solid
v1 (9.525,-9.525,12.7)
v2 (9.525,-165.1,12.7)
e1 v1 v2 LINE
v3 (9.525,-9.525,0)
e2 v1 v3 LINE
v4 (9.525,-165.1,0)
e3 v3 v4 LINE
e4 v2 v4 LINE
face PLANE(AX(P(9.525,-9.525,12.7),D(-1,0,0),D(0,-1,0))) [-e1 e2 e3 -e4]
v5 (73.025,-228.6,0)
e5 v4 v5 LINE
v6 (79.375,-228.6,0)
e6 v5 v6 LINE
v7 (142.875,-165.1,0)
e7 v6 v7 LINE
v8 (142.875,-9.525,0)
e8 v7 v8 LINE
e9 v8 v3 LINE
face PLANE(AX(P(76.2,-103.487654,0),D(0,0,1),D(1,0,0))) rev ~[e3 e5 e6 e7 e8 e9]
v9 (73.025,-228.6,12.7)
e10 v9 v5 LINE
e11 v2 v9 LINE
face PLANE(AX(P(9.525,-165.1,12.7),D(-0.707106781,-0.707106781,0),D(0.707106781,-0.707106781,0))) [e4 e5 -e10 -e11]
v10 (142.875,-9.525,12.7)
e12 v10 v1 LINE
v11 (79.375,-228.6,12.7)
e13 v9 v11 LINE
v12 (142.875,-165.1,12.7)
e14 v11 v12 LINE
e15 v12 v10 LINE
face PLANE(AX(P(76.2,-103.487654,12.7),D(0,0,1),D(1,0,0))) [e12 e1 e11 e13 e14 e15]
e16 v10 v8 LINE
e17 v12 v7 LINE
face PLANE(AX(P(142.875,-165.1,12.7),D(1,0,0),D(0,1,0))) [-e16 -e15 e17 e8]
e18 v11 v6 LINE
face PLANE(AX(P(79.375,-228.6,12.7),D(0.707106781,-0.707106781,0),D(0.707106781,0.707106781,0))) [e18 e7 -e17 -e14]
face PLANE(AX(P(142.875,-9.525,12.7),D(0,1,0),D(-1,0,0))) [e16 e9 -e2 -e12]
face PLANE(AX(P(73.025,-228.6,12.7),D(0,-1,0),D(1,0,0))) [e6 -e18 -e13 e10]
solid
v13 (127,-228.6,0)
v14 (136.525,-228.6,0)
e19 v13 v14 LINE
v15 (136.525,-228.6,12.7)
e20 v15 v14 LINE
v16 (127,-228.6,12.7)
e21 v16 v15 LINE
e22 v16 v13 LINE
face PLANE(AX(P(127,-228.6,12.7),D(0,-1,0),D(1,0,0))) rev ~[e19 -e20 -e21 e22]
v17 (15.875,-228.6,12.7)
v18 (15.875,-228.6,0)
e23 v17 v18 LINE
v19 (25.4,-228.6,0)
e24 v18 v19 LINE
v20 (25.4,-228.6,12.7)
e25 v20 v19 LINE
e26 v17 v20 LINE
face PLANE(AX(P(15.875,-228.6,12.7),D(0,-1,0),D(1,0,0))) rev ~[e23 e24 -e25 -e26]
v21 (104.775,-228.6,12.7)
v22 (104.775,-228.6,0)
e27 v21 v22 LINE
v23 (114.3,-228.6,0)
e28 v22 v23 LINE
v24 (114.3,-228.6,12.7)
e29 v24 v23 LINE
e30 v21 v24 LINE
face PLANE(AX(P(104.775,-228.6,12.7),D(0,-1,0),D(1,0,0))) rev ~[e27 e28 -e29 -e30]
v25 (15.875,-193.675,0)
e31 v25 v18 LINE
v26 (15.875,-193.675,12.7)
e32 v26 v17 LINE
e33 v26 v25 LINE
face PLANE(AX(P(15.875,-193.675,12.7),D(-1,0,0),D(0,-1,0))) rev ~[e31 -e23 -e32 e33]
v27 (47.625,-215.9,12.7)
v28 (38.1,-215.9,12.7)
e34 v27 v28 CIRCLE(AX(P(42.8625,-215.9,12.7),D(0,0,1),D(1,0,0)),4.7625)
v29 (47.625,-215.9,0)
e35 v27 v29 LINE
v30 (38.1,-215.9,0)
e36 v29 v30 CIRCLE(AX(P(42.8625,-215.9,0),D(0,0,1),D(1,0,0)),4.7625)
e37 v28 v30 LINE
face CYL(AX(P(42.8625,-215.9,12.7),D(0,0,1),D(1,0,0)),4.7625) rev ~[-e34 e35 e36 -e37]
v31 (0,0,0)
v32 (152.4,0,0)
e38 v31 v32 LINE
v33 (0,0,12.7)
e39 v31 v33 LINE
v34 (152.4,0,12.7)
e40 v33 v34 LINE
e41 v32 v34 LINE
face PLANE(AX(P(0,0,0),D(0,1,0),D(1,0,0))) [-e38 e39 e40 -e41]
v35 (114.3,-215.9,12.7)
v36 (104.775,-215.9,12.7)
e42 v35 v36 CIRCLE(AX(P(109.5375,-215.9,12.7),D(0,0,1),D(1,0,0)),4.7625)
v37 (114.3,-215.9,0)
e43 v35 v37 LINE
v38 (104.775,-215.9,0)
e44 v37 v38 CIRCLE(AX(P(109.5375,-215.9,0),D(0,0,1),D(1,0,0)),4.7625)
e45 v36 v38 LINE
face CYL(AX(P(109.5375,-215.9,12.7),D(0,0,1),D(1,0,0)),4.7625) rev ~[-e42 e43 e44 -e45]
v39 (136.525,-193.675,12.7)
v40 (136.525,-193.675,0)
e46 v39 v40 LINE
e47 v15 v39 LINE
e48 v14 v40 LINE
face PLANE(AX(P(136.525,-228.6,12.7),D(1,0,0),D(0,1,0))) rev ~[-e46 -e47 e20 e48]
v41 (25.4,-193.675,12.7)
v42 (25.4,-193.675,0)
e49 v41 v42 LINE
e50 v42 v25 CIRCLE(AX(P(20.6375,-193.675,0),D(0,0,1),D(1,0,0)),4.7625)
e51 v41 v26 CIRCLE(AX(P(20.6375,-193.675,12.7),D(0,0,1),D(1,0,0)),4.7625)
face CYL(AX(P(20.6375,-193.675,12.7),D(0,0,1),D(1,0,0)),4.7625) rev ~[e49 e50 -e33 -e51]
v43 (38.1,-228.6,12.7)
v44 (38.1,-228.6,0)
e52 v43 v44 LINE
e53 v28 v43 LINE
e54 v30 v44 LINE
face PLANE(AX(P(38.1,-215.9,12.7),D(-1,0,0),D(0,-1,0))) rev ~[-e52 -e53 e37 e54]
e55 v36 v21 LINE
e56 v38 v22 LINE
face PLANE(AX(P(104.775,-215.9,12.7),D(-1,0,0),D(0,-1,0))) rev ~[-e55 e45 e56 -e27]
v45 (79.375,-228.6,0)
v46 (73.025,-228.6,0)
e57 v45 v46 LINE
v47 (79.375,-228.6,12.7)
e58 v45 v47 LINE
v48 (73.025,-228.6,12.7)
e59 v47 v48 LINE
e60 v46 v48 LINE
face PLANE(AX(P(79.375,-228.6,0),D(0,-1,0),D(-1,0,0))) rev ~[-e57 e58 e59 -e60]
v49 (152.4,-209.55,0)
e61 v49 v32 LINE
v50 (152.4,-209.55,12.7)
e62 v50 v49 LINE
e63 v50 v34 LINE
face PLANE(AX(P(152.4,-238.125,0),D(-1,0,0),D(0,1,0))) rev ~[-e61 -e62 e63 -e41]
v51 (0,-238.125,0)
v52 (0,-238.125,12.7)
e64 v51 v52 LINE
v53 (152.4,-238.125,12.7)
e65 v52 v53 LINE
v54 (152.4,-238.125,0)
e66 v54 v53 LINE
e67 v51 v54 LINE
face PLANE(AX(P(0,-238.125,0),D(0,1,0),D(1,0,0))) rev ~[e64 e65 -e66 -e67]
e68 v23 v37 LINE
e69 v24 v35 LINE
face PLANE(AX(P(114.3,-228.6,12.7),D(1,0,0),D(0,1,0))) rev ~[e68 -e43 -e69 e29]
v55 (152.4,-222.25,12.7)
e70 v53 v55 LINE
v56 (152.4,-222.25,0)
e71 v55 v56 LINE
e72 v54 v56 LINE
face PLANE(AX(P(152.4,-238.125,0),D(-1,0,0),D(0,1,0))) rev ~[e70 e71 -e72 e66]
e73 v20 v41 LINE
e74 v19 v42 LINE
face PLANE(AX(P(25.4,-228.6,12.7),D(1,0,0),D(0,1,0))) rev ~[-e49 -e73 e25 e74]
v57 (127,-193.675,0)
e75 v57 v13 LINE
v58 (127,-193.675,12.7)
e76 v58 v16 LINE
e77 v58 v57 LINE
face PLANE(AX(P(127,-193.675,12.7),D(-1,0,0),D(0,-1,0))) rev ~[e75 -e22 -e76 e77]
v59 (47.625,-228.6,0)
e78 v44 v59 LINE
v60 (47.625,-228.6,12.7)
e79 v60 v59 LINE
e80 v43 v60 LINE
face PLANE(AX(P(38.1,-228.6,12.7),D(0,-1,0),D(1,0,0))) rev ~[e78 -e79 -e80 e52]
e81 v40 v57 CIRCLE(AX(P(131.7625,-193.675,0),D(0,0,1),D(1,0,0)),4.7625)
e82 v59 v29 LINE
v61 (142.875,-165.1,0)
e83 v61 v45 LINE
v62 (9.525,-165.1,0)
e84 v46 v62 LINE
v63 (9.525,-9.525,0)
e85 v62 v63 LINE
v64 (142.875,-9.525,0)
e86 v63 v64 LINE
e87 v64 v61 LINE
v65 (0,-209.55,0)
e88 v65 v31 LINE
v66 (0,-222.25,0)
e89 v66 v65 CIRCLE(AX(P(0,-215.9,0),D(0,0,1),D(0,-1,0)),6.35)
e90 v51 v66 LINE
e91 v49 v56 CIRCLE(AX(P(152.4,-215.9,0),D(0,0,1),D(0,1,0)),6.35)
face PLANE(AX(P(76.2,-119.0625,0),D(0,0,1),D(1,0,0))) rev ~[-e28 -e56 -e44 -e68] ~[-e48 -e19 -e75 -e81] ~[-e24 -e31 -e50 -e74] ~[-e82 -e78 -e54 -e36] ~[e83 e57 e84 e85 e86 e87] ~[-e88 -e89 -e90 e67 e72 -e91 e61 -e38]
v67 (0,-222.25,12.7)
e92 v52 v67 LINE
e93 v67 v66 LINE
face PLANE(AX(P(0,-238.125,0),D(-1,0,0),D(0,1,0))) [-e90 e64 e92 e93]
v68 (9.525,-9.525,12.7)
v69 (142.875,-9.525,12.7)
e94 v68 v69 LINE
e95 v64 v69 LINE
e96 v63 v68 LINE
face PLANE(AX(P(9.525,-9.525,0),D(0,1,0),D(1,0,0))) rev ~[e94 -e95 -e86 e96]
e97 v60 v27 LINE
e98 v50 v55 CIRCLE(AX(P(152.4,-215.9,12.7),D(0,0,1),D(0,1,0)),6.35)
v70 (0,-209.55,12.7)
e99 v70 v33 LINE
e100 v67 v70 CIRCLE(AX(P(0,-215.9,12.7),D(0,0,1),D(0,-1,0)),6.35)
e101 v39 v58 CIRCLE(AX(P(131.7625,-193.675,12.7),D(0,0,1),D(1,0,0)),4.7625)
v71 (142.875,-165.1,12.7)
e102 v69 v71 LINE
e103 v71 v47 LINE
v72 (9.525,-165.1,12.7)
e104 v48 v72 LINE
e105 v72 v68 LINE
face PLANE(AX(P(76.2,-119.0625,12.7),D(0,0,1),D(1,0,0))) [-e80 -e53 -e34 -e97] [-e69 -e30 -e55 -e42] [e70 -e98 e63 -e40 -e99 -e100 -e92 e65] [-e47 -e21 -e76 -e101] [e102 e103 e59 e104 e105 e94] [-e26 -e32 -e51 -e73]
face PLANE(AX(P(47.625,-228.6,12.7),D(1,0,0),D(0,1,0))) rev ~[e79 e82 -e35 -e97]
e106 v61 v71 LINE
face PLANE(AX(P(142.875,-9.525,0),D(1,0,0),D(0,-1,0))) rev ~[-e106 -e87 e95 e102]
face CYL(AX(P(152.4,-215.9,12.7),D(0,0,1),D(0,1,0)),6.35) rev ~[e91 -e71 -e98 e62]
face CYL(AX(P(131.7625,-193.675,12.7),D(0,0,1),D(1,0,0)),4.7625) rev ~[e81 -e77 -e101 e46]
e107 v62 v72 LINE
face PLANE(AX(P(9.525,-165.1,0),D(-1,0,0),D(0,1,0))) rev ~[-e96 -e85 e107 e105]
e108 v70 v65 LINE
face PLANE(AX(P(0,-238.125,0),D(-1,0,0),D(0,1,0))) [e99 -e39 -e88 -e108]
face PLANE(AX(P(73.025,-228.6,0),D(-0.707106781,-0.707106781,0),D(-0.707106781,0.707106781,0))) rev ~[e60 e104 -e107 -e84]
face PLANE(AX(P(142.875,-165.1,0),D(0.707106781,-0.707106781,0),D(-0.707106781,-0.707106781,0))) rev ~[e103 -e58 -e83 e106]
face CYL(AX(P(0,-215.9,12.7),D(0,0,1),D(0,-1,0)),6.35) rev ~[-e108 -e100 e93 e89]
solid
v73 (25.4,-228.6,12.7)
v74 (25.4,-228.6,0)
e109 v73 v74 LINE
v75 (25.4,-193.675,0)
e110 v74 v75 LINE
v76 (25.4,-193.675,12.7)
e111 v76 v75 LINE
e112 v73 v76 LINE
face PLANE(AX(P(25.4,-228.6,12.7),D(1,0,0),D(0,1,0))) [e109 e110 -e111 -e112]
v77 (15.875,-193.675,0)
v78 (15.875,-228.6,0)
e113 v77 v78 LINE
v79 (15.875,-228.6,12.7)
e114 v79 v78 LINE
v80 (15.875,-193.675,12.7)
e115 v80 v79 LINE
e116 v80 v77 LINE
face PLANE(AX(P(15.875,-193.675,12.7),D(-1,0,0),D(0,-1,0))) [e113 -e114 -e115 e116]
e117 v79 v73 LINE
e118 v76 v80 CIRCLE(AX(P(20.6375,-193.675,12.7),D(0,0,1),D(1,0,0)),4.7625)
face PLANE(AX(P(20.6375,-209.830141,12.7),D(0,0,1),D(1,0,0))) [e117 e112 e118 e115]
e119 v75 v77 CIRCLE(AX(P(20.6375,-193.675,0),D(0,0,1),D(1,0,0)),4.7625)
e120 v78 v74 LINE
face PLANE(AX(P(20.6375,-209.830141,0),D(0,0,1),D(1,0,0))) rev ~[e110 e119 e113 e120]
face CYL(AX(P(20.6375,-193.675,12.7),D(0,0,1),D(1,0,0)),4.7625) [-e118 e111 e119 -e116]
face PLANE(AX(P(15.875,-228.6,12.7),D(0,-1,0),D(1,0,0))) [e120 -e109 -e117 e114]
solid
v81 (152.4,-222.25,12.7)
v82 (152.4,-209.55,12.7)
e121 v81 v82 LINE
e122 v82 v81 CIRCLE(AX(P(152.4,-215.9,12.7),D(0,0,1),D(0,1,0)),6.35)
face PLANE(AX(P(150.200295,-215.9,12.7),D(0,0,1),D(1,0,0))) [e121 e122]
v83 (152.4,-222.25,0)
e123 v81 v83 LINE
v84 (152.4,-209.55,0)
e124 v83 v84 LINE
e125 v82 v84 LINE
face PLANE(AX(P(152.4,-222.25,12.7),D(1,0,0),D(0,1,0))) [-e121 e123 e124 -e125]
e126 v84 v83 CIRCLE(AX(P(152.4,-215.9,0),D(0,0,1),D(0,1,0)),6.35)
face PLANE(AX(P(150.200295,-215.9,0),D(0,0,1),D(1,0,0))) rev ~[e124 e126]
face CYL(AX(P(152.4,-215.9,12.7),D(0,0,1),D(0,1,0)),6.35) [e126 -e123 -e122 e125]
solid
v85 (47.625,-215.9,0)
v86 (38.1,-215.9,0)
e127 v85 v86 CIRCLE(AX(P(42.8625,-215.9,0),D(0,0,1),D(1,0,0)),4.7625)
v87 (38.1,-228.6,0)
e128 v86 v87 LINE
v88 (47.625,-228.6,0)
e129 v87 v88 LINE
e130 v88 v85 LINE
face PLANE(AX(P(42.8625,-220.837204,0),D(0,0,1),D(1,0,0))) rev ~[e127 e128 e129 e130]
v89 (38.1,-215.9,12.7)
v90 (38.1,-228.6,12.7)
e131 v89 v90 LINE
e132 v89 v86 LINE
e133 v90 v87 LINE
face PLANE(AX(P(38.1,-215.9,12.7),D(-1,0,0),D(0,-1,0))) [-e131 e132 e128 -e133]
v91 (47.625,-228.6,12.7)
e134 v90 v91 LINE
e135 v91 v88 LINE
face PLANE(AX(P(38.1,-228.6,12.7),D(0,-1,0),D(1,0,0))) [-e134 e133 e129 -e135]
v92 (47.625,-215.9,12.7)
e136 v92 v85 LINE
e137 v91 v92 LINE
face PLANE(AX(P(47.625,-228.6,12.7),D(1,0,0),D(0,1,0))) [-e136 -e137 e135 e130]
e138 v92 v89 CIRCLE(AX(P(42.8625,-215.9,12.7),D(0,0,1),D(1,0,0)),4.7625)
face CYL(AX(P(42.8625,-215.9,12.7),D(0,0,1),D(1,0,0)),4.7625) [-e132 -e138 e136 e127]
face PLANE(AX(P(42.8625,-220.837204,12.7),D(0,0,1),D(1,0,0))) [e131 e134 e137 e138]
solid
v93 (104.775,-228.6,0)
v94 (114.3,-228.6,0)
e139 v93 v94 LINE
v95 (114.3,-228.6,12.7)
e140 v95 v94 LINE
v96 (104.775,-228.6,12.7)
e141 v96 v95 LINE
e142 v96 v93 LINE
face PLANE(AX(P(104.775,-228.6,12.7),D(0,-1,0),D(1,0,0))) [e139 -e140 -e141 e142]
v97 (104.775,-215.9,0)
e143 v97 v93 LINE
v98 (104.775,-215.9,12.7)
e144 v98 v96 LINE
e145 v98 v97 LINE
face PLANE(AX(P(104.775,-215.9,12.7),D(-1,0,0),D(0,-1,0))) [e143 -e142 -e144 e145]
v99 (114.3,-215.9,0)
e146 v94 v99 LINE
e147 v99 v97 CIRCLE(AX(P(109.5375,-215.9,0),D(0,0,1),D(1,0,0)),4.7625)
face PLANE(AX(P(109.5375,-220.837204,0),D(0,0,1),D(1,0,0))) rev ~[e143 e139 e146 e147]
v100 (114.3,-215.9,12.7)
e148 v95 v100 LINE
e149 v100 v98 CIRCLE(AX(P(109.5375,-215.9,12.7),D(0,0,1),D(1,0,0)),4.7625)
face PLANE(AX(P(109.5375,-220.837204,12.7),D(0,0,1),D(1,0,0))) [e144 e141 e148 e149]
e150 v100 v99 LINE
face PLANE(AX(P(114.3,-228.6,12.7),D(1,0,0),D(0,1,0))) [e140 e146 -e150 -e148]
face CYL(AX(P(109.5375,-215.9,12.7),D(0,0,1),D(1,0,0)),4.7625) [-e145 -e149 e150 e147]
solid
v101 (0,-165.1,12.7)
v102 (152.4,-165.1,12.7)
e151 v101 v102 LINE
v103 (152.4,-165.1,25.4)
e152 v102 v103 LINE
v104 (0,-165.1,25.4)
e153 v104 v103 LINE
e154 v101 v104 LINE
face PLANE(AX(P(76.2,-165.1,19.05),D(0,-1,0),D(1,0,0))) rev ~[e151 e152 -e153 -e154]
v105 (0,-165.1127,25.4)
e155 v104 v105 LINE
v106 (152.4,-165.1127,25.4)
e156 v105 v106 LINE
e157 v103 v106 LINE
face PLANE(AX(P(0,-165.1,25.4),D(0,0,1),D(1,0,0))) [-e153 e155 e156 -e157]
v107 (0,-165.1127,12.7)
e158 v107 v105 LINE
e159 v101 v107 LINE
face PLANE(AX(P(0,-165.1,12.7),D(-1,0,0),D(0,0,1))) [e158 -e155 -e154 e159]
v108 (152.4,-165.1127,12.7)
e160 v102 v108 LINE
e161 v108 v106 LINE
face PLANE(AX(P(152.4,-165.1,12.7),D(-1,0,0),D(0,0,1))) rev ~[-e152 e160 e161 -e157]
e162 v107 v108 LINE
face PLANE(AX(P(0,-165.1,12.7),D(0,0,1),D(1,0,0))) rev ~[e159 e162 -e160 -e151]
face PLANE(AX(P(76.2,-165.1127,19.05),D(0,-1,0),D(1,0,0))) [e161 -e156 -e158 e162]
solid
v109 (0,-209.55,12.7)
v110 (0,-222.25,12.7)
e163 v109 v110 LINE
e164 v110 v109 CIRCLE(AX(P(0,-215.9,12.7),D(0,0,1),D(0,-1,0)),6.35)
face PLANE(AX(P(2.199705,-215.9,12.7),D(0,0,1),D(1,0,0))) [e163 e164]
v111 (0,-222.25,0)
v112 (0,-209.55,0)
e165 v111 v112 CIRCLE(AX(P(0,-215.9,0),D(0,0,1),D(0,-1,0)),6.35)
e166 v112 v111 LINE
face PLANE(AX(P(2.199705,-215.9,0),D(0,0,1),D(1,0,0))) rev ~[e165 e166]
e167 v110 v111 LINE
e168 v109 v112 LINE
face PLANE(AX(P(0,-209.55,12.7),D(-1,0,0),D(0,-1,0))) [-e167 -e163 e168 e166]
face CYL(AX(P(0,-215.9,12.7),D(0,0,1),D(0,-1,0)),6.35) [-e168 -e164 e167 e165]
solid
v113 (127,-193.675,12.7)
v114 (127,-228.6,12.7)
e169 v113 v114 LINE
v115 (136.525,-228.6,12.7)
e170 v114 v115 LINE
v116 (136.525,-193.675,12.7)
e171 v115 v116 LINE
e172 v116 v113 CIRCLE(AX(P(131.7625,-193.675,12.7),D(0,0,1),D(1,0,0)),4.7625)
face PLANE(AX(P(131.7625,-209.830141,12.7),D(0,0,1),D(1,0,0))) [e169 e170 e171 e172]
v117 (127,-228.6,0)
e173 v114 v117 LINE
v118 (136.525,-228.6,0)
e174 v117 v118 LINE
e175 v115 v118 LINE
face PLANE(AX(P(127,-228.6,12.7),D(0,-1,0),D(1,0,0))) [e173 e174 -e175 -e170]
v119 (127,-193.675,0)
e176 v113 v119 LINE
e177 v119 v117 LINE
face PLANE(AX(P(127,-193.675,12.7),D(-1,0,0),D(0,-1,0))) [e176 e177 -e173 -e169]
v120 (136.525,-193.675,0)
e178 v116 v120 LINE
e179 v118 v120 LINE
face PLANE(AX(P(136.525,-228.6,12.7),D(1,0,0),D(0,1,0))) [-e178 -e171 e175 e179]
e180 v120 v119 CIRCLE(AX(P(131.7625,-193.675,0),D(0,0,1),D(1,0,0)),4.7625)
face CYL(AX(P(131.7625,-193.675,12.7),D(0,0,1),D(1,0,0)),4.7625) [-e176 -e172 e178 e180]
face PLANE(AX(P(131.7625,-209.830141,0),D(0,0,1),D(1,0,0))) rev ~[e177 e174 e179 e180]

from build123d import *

# Parameters (mm, degrees)
F0_W      = 152.4
F0_H      = 238.125
F1_DEPTH  = 12.7
F3_DEPTH  = 12.7
F5_DEPTH  = 25.4
F7_DEPTH  = 12.7
F9_DEPTH  = 12.7
F11_E36_W = 152.4
F11_E36_H = 12.7
F12_DEPTH = 0.0127


with BuildPart() as f1:
    # F0 (on Top) → F1 (new body)
    with BuildSketch(Plane.XY):
        with Locations((76.2, -119.0625)):
            Rectangle(F0_W, F0_H)
        Polygon((9.525, -9.525), (142.875, -9.525), (142.875, -165.1), (79.375, -228.6), (73.025, -228.6), (9.525, -165.1), align=None, mode=Mode.SUBTRACT)
    extrude(amount=F1_DEPTH)

    # F2 (on face) → F3 (cut, through all)
    with BuildSketch(Plane.XY.offset(12.7)):
        with BuildLine():
            Line((0, -209.55), (0, -222.25))
            ThreePointArc((0, -222.25), (6.35, -215.9), (0, -209.55))
        make_face()
        with BuildLine():
            ThreePointArc((152.4, -209.55), (146.05, -215.9), (152.4, -222.25))
            Line((152.4, -222.25), (152.4, -209.55))
        make_face()
    extrude(amount=-F3_DEPTH, mode=Mode.SUBTRACT)

    # F4 (on face) → F5 (cut)
    with BuildSketch(Plane.XY.offset(12.7)):
        with BuildLine():
            Line((15.875, -193.675), (15.875, -228.6))
            Line((15.875, -228.6), (25.4, -228.6))
            Line((25.4, -228.6), (25.4, -193.675))
            ThreePointArc((25.4, -193.675), (20.6375, -188.9125), (15.875, -193.675))
        make_face()
        with BuildLine():
            Line((38.1, -215.9), (38.1, -228.6))
            Line((38.1, -228.6), (47.625, -228.6))
            Line((47.625, -228.6), (47.625, -215.9))
            ThreePointArc((47.625, -215.9), (42.8625, -211.1375), (38.1, -215.9))
        make_face()
        with BuildLine():
            ThreePointArc((136.525, -193.675), (131.7625, -188.9125), (127, -193.675))
            Line((127, -193.675), (127, -228.6))
            Line((127, -228.6), (136.525, -228.6))
            Line((136.525, -228.6), (136.525, -193.675))
        make_face()
        with BuildLine():
            Line((104.775, -215.9), (104.775, -228.6))
            Line((104.775, -228.6), (114.3, -228.6))
            Line((114.3, -228.6), (114.3, -215.9))
            ThreePointArc((114.3, -215.9), (109.5375, -211.1375), (104.775, -215.9))
        make_face()
    extrude(amount=-F5_DEPTH, mode=Mode.SUBTRACT)


with BuildPart() as f7:
    # F6 (on face) → F7 (new body)
    with BuildSketch(Plane.XY.offset(12.7)):
        Polygon((9.525, -9.525), (9.525, -165.1), (73.025, -228.6), (79.375, -228.6), (142.875, -165.1), (142.875, -9.525), align=None)
    extrude(amount=-F7_DEPTH)


with BuildPart() as f7b:
    # F6 (on face) → F7, piece 2 (new body)
    with BuildSketch(Plane.XY.offset(12.7)):
        with BuildLine():
            Line((15.875, -193.675), (15.875, -228.6))
            Line((15.875, -228.6), (25.4, -228.6))
            Line((25.4, -228.6), (25.4, -193.675))
            ThreePointArc((25.4, -193.675), (20.6375, -188.9125), (15.875, -193.675))
        make_face()
    extrude(amount=-F7_DEPTH)


with BuildPart() as f7c:
    # F6 (on face) → F7, piece 3 (new body)
    with BuildSketch(Plane.XY.offset(12.7)):
        with BuildLine():
            Line((47.625, -228.6), (47.625, -215.9))
            ThreePointArc((47.625, -215.9), (42.8625, -211.1375), (38.1, -215.9))
            Line((38.1, -215.9), (38.1, -228.6))
            Line((38.1, -228.6), (47.625, -228.6))
        make_face()
    extrude(amount=-F7_DEPTH)


with BuildPart() as f7d:
    # F6 (on face) → F7, piece 4 (new body)
    with BuildSketch(Plane.XY.offset(12.7)):
        with BuildLine():
            Line((104.775, -215.9), (104.775, -228.6))
            Line((104.775, -228.6), (114.3, -228.6))
            Line((114.3, -228.6), (114.3, -215.9))
            ThreePointArc((114.3, -215.9), (109.5375, -211.1375), (104.775, -215.9))
        make_face()
    extrude(amount=-F7_DEPTH)


with BuildPart() as f7e:
    # F6 (on face) → F7, piece 5 (new body)
    with BuildSketch(Plane.XY.offset(12.7)):
        with BuildLine():
            ThreePointArc((136.525, -193.675), (131.7625, -188.9125), (127, -193.675))
            Line((127, -193.675), (127, -228.6))
            Line((127, -228.6), (136.525, -228.6))
            Line((136.525, -228.6), (136.525, -193.675))
        make_face()
    extrude(amount=-F7_DEPTH)


with BuildPart() as f9:
    # F8 (on face) → F9 (new body)
    with BuildSketch(Plane.XY.offset(12.7)):
        with BuildLine():
            Line((0, -209.55), (0, -222.25))
            ThreePointArc((0, -222.25), (6.35, -215.9), (0, -209.55))
        make_face()
    extrude(amount=-F9_DEPTH)


with BuildPart() as f9b:
    # F8 (on face) → F9, piece 2 (new body)
    with BuildSketch(Plane.XY.offset(12.7)):
        with BuildLine():
            Line((152.4, -222.25), (152.4, -209.55))
            ThreePointArc((152.4, -209.55), (146.05, -215.9), (152.4, -222.25))
        make_face()
    extrude(amount=-F9_DEPTH)


with BuildPart() as f12:
    # F11_E36 (on explicit) → F12 (new body)
    with BuildSketch(Plane(origin=(0, -165.1, 12.7), x_dir=(1, 0, 0), z_dir=(0, -1, 0))):
        with Locations((76.2, 6.35)):
            Rectangle(F11_E36_W, F11_E36_H)
    extrude(amount=F12_DEPTH)


solid = Compound([f1.part, f7.part, f7b.part, f7c.part, f7d.part, f7e.part, f9.part, f9b.part, f12.part])
